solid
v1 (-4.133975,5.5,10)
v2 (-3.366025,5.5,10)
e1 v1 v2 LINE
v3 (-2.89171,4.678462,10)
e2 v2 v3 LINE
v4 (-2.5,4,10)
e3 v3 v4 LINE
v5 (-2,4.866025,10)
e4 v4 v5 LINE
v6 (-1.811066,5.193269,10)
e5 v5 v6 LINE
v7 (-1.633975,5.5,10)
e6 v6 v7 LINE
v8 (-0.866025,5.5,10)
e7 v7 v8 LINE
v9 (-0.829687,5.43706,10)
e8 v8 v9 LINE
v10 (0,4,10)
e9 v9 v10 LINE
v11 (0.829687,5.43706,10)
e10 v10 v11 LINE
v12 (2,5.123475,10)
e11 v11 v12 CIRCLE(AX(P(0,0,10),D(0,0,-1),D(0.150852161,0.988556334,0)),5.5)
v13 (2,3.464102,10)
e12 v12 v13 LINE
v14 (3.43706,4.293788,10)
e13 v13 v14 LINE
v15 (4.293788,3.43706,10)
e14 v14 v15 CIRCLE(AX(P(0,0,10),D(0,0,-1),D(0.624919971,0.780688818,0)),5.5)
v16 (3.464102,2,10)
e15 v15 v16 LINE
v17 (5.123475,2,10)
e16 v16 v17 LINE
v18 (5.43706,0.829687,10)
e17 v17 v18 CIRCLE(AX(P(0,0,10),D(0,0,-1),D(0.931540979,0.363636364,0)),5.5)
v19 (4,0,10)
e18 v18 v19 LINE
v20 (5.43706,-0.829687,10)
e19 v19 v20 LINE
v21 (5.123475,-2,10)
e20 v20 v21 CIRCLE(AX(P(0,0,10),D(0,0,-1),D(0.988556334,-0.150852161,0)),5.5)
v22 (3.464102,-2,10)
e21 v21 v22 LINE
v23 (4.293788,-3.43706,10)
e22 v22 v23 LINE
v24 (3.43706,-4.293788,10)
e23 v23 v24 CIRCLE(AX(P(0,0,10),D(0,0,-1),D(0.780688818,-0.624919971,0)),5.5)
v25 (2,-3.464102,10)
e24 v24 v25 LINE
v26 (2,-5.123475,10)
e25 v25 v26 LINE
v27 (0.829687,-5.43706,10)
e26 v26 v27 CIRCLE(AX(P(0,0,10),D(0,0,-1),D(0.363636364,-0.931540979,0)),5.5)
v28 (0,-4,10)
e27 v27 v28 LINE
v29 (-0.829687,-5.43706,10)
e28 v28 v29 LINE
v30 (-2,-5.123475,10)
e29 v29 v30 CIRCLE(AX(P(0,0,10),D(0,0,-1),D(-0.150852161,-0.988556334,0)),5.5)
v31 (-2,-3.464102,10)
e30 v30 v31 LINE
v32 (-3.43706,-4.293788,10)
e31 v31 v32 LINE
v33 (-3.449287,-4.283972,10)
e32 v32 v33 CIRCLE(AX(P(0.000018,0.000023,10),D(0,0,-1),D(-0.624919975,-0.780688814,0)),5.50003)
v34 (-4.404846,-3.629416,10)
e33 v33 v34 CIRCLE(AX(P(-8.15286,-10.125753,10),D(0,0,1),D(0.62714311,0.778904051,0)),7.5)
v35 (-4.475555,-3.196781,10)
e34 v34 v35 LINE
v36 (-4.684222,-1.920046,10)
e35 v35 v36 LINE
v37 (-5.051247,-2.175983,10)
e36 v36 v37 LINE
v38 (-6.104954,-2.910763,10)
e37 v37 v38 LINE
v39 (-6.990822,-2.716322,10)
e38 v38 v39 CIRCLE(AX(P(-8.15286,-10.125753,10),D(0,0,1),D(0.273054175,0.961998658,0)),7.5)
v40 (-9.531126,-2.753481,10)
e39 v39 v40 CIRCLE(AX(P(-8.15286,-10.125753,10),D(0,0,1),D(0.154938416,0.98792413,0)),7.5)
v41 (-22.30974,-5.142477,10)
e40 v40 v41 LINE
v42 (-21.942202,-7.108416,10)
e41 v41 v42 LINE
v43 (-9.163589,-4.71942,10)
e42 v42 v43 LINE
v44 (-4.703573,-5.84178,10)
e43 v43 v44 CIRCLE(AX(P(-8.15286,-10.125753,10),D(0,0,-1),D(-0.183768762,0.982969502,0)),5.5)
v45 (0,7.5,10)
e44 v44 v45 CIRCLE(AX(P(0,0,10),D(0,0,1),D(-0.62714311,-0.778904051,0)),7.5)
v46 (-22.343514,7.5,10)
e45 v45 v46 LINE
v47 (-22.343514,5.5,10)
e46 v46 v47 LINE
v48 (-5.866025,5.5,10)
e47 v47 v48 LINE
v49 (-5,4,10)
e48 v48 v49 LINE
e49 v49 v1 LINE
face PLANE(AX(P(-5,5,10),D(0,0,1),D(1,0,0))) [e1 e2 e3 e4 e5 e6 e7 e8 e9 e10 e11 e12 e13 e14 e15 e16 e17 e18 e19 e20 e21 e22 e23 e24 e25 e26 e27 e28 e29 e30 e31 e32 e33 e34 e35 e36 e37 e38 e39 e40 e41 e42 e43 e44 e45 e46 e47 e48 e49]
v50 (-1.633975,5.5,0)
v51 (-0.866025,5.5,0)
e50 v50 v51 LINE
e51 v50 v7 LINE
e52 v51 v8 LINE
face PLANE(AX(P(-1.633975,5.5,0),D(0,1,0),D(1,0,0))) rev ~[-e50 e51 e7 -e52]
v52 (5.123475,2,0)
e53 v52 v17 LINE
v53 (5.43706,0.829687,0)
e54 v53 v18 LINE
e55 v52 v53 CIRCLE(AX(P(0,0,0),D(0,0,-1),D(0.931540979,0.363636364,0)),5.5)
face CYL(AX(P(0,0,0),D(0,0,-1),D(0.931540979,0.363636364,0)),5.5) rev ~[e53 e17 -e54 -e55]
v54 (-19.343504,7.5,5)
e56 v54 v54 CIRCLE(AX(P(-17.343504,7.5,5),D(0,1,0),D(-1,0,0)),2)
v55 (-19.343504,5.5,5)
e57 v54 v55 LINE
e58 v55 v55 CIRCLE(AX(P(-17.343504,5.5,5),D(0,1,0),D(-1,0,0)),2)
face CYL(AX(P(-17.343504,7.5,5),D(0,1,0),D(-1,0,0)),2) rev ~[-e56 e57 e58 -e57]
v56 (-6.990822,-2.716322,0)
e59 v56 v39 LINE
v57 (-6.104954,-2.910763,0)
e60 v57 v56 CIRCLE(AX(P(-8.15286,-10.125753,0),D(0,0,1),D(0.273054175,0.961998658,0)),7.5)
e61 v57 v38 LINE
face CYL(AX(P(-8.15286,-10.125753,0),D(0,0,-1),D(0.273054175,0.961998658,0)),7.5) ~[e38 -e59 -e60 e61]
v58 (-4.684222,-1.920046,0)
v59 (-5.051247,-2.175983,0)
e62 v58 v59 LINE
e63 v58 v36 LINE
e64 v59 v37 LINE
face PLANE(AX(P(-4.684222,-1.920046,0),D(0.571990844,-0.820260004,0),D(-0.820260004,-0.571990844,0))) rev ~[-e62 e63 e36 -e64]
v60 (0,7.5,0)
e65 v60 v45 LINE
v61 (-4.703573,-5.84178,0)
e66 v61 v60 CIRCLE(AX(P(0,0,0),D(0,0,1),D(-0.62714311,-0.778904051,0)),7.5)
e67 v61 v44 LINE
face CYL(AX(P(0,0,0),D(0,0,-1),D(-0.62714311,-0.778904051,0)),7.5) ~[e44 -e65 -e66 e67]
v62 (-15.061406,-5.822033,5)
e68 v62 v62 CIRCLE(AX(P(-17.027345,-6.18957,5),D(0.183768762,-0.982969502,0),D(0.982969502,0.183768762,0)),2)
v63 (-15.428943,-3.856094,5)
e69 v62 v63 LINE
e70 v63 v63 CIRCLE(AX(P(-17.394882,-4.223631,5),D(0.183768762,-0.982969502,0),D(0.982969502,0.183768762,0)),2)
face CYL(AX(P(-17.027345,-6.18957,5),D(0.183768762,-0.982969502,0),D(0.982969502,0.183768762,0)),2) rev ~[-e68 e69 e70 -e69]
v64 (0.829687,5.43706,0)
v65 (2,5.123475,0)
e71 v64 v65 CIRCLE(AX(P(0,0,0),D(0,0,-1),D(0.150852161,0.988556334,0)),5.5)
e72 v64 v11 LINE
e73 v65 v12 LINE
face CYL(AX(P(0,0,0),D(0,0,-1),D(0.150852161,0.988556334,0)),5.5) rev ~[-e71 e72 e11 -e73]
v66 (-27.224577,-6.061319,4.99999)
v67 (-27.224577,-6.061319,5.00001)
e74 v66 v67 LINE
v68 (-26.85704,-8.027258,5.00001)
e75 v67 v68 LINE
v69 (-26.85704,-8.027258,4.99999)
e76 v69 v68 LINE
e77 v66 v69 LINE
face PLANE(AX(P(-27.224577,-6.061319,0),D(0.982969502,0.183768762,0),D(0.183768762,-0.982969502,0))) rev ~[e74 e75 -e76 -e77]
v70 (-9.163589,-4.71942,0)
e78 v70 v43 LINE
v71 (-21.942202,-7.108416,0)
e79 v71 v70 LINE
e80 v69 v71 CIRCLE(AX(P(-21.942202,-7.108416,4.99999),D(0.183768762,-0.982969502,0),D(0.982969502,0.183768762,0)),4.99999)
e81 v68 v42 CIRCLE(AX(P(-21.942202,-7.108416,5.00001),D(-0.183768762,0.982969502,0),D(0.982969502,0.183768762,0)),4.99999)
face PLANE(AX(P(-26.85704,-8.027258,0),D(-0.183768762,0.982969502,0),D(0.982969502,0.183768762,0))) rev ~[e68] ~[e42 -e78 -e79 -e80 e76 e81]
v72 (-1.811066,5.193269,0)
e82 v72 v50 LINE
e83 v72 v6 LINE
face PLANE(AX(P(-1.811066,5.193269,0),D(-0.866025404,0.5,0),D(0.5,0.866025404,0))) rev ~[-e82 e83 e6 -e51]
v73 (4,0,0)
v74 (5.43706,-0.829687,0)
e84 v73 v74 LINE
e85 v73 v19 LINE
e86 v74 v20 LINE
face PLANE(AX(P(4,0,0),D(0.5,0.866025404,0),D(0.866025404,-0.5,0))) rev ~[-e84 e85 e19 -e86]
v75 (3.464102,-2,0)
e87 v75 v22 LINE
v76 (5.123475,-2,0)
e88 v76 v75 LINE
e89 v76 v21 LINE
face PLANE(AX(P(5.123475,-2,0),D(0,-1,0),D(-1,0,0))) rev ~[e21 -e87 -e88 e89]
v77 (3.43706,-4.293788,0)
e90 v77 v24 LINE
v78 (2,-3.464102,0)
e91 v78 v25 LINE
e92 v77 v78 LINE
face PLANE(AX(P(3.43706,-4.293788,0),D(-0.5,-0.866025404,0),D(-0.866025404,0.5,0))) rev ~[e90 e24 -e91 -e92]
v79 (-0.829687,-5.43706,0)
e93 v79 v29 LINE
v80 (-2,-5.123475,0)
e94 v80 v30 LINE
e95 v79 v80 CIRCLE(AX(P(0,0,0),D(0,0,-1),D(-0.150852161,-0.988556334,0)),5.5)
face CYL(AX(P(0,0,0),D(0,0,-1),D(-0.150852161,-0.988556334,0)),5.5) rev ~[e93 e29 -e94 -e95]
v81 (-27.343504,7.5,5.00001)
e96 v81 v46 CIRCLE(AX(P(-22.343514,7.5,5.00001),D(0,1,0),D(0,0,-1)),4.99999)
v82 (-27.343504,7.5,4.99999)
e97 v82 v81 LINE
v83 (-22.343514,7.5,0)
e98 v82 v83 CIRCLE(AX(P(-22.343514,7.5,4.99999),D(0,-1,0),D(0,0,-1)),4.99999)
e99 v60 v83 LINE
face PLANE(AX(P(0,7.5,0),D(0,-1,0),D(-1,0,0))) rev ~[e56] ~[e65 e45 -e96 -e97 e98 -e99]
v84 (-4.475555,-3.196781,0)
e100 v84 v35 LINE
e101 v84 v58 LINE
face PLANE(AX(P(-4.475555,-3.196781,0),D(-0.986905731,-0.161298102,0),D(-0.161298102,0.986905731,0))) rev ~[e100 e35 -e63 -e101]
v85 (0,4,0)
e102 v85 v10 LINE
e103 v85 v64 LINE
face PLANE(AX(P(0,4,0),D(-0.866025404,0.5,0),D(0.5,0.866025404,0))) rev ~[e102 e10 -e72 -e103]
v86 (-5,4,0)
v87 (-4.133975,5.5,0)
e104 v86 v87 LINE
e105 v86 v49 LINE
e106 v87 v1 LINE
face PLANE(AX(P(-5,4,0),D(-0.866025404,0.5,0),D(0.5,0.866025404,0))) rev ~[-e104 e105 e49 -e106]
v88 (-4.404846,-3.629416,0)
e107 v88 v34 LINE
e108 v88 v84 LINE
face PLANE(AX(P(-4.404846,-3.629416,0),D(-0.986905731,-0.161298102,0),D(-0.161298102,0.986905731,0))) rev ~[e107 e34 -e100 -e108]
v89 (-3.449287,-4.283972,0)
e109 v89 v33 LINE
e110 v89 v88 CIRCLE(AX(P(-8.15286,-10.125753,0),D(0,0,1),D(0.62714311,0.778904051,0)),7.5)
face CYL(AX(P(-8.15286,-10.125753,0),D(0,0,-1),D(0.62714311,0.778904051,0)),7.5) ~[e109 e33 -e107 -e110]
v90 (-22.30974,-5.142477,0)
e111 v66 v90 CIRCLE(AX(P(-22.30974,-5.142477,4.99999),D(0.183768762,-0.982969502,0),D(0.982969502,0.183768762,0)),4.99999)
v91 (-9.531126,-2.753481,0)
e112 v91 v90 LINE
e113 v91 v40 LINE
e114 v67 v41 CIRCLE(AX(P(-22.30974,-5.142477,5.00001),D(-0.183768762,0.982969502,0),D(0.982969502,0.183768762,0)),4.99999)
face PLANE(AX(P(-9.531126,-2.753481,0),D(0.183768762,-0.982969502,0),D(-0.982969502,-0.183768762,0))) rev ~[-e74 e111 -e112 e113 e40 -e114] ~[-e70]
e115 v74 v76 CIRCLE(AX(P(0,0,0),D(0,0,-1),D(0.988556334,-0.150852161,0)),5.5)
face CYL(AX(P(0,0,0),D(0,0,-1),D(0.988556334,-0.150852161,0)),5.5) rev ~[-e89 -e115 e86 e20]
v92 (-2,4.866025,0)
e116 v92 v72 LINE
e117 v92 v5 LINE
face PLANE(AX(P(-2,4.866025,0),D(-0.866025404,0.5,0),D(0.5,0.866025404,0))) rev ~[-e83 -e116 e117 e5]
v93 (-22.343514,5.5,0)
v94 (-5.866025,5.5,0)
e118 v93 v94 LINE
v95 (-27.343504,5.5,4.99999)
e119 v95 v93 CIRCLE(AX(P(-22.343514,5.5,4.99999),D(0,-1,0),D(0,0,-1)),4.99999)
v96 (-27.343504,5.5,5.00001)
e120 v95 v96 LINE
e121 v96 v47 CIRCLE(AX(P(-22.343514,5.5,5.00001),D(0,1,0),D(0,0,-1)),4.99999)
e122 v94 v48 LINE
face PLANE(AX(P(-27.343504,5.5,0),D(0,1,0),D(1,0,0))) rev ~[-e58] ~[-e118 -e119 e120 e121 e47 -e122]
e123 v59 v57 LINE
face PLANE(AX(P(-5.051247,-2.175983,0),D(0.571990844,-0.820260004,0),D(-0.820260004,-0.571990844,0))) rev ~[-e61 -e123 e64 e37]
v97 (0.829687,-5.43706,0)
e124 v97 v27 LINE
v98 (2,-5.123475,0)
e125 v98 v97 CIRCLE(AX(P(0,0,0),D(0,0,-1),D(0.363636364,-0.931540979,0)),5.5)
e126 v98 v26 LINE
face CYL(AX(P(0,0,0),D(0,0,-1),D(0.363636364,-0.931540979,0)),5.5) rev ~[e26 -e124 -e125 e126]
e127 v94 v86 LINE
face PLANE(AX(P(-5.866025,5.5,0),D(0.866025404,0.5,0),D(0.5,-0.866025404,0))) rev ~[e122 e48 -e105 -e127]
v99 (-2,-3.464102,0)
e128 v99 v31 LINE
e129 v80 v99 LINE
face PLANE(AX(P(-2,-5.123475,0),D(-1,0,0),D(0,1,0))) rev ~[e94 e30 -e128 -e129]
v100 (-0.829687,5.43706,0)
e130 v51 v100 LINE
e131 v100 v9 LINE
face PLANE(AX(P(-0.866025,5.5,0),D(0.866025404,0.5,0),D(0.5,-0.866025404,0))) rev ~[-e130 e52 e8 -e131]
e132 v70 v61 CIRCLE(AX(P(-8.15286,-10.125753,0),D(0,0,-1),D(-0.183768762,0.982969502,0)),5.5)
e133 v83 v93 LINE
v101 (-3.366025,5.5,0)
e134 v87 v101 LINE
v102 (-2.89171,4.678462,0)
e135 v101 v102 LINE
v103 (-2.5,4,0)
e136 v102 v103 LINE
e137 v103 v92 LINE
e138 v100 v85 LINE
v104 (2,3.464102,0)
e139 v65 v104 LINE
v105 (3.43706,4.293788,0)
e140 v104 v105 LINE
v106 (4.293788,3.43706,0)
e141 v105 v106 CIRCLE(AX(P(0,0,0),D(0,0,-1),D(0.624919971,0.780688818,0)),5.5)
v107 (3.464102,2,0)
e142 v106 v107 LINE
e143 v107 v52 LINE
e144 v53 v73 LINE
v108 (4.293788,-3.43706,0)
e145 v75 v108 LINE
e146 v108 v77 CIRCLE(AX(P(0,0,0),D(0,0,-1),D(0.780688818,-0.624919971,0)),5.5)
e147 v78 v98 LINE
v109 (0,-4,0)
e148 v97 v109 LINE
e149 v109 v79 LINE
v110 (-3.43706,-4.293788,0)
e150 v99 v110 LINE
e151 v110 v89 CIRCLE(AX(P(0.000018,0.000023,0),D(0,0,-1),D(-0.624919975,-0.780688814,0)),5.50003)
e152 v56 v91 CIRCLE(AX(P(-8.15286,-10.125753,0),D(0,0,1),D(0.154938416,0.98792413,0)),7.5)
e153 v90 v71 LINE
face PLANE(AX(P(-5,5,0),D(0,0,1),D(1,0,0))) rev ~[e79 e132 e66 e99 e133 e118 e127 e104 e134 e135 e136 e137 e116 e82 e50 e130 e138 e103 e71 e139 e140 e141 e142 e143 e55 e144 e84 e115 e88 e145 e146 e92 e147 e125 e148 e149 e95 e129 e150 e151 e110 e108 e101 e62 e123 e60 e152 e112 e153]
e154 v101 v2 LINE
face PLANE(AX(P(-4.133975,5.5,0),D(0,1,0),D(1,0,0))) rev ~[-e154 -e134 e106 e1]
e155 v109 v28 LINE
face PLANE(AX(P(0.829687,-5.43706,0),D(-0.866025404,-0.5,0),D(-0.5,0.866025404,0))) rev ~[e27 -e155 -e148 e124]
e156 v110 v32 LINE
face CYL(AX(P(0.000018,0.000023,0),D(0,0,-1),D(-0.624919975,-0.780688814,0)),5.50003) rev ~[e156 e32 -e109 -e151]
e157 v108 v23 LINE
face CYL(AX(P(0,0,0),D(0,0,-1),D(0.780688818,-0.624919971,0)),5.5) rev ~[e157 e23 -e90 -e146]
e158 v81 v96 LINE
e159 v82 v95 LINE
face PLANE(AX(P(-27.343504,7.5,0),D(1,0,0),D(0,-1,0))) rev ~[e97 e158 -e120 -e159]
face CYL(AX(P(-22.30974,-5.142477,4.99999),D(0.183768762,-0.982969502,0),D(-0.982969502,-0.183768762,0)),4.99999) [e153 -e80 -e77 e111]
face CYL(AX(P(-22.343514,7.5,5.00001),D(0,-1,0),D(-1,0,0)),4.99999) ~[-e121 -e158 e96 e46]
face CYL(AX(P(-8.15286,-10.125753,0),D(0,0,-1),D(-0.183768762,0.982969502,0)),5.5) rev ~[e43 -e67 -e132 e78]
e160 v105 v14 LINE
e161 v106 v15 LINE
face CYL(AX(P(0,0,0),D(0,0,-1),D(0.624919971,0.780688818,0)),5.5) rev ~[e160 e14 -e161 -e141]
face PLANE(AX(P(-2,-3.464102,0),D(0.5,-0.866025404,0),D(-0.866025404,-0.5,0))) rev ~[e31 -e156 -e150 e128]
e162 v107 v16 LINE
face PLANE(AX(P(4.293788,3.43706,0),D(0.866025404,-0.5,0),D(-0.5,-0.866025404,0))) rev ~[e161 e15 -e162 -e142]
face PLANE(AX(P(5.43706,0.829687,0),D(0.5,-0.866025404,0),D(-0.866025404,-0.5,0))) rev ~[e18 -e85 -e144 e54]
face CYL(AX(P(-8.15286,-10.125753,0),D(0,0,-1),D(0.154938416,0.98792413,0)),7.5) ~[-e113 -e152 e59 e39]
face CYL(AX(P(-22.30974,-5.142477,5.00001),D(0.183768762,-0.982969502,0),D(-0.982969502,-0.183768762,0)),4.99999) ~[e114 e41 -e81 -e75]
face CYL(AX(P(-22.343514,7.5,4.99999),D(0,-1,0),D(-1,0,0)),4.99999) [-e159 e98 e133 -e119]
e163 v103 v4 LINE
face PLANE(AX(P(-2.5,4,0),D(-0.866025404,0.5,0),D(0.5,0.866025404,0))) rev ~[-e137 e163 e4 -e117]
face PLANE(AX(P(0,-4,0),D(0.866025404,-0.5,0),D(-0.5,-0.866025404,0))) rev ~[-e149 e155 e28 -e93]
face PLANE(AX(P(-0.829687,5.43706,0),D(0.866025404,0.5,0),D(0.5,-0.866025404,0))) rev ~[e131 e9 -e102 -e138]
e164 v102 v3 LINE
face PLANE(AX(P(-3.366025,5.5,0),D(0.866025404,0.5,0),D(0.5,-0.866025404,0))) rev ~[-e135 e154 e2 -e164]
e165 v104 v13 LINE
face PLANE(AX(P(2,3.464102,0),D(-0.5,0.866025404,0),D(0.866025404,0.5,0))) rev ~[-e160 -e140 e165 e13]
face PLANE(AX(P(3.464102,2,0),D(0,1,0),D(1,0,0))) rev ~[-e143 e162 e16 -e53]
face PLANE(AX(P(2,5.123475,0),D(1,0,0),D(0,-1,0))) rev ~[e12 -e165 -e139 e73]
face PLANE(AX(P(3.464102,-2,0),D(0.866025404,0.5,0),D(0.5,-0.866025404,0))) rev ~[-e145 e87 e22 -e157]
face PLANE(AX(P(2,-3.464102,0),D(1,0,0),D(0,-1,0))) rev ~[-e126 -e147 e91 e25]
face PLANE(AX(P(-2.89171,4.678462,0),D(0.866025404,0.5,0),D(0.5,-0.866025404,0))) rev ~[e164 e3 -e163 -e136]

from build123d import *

# Parameters (mm, degrees)
F1_DEPTH = 10
F2_R     = 4.99999
F3_R     = 2
F4_DEPTH = 2
F5_R     = 2
F6_DEPTH = 2


# Not quite as in the source:
# - a fillet or chamfer is up to 0.001 mm smaller than in the source, because OpenCascade refuses the exact size


with BuildPart() as f1:
    # F0 (on Top) → F1 (new body)
    with BuildSketch(Plane.XY):
        Polygon((-5, 4), (-4.1339745962, 5.5), (-5.8660254038, 5.5), align=None)
        Polygon((-26.857039656, -8.0272581187), (-9.163588619, -4.7194203959), (-9.5311261437, -2.7534813918), (-27.2245771808, -6.0613191145), align=None)
        with BuildLine():
            ThreePointArc((-3.4370598373, -4.2937884991), (-2.75, -4.7631397208), (-2, -5.123475383))
            Line((-2, -5.123475383), (-2, -3.4641016151))
            Line((-2, -3.4641016151), (-3.4370598373, -4.2937884991))
        make_face()
        with BuildLine():
            ThreePointArc((-0.8296868839, -5.4370598373), (0, -5.5), (0.8296868839, -5.4370598373))
            Line((0.8296868839, -5.4370598373), (0, -4))
            Line((0, -4), (-0.8296868839, -5.4370598373))
        make_face()
        with BuildLine():
            ThreePointArc((2, -5.123475383), (2.75, -4.7631397208), (3.4370598373, -4.2937884991))
            Line((3.4370598373, -4.2937884991), (2, -3.4641016151))
            Line((2, -3.4641016151), (2, -5.123475383))
        make_face()
        with BuildLine():
            ThreePointArc((4.2937884991, -3.4370598373), (4.7631397208, -2.75), (5.123475383, -2))
            Line((5.123475383, -2), (3.4641016151, -2))
            Line((3.4641016151, -2), (4.2937884991, -3.4370598373))
        make_face()
        with BuildLine():
            ThreePointArc((5.4370598373, -0.8296868839), (5.5, 0), (5.4370598373, 0.8296868839))
            Line((5.4370598373, 0.8296868839), (4, 0))
            Line((4, 0), (5.4370598373, -0.8296868839))
        make_face()
        with BuildLine():
            Line((0, 4), (0.8296868839, 5.4370598373))
            ThreePointArc((0.8296868839, 5.4370598373), (0.416035392, 5.4842423864), (0, 5.5))
            Line((0, 5.5), (0, 4))
        make_face()
        with BuildLine():
            ThreePointArc((0, 5.5), (0.416035392, 5.4842423864), (0.8296868839, 5.4370598373))
            Line((0.8296868839, 5.4370598373), (0.8660254038, 5.5))
            Line((0.8660254038, 5.5), (0, 5.5))
        make_face()
        with BuildLine():
            Line((0, 4), (0, 5.5))
            ThreePointArc((0, 5.5), (-0.416035392, 5.4842423864), (-0.8296868839, 5.4370598373))
            Line((-0.8296868839, 5.4370598373), (0, 4))
        make_face()
        with BuildLine():
            Line((-2, 4.8660254038), (-1.8110659829, 5.1932687207))
            ThreePointArc((-1.8110659829, 5.1932687207), (-1.9058525019, 5.1592369824), (-2, 5.123475383))
            Line((-2, 5.123475383), (-2, 4.8660254038))
        make_face()
        with BuildLine():
            Line((-2, 4.8660254038), (-2, 5.123475383))
            ThreePointArc((-2, 5.123475383), (-2.4559554031, 4.9212074797), (-2.8917104606, 4.6784624196))
            Line((-2.8917104606, 4.6784624196), (-2.5, 4))
            Line((-2.5, 4), (-2, 4.8660254038))
        make_face()
        with BuildLine():
            ThreePointArc((-9.163588619, -4.7194203959), (-6.8106363862, -4.7920452574), (-4.7035733226, -5.8417803792))
            ThreePointArc((-4.7035733226, -5.8417803792), (-6.0524247462, -4.4292386131), (-6.9908223073, -2.7163216797))
            ThreePointArc((-6.9908223073, -2.7163216797), (-8.2625591256, -2.6265549538), (-9.5311261437, -2.7534813918))
            Line((-9.5311261437, -2.7534813918), (-9.163588619, -4.7194203959))
        make_face()
        with BuildLine():
            Line((-4.6842221141, -1.9200455203), (-4.9155419039, -2.4672753781))
            ThreePointArc((-4.9155419039, -2.4672753781), (-4.7096941165, -2.8405600379), (-4.4755547297, -3.196781172))
            Line((-4.4755547297, -3.196781172), (-4.6842221141, -1.9200455203))
        make_face()
        with BuildLine():
            Line((-4.6842221141, -1.9200455203), (-5.0512472947, -2.175982713))
            ThreePointArc((-5.0512472947, -2.175982713), (-4.9855224988, -2.3226203765), (-4.9155419039, -2.4672753781))
            Line((-4.9155419039, -2.4672753781), (-4.6842221141, -1.9200455203))
        make_face()
        with BuildLine():
            ThreePointArc((-0.8296868839, 5.4370598373), (-0.416035392, 5.4842423864), (0, 5.5))
            Line((0, 5.5), (-0.8660254038, 5.5))
            Line((-0.8660254038, 5.5), (-0.8296868839, 5.4370598373))
        make_face()
        with BuildLine():
            Line((-5.0512472947, -2.175982713), (-6.104954117, -2.9107627231))
            ThreePointArc((-6.104954117, -2.9107627231), (-5.6640980624, -3.0507217811), (-5.2327078262, -3.2175901813))
            Line((-5.2327078262, -3.2175901813), (-4.9155419039, -2.4672753781))
            ThreePointArc((-4.9155419039, -2.4672753781), (-4.9855224988, -2.3226203765), (-5.0512472947, -2.175982713))
        make_face()
        with BuildLine():
            ThreePointArc((-2, 5.123475383), (-1.9058525019, 5.1592369824), (-1.8110659829, 5.1932687207))
            Line((-1.8110659829, 5.1932687207), (-1.6339745962, 5.5))
            Line((-1.6339745962, 5.5), (-3.3660254038, 5.5))
            Line((-3.3660254038, 5.5), (-2.8917104606, 4.6784624196))
            ThreePointArc((-2.8917104606, 4.6784624196), (-2.4559554031, 4.9212074797), (-2, 5.123475383))
        make_face()
        with BuildLine():
            Line((-4.9155419039, -2.4672753781), (-5.2327078262, -3.2175901813))
            ThreePointArc((-5.2327078262, -3.2175901813), (-4.8124241684, -3.4107332523), (-4.404845606, -3.629416389))
            Line((-4.404845606, -3.629416389), (-4.4755547297, -3.196781172))
            ThreePointArc((-4.4755547297, -3.196781172), (-4.7096941165, -2.8405600379), (-4.9155419039, -2.4672753781))
        make_face()
        with BuildLine():
            ThreePointArc((0.8296868839, 5.4370598373), (1.4235047481, 5.3125920446), (2, 5.123475383))
            Line((2, 5.123475383), (2, 3.4641016151))
            Line((2, 3.4641016151), (3.4370598373, 4.2937884991))
            ThreePointArc((3.4370598373, 4.2937884991), (3.8890872965, 3.8890872965), (4.2937884991, 3.4370598373))
            Line((4.2937884991, 3.4370598373), (3.4641016151, 2))
            Line((3.4641016151, 2), (5.123475383, 2))
            ThreePointArc((5.123475383, 2), (5.3125920446, 1.4235047481), (5.4370598373, 0.8296868839))
            ThreePointArc((5.4370598373, 0.8296868839), (5.5, 0), (5.4370598373, -0.8296868839))
            ThreePointArc((5.4370598373, -0.8296868839), (5.3125920446, -1.4235047481), (5.123475383, -2))
            ThreePointArc((5.123475383, -2), (4.7631397208, -2.75), (4.2937884991, -3.4370598373))
            ThreePointArc((4.2937884991, -3.4370598373), (3.8890872965, -3.8890872965), (3.4370598373, -4.2937884991))
            ThreePointArc((3.4370598373, -4.2937884991), (2.75, -4.7631397208), (2, -5.123475383))
            ThreePointArc((2, -5.123475383), (1.4235047481, -5.3125920446), (0.8296868839, -5.4370598373))
            ThreePointArc((0.8296868839, -5.4370598373), (0, -5.5), (-0.8296868839, -5.4370598373))
            ThreePointArc((-0.8296868839, -5.4370598373), (-1.4235047481, -5.3125920446), (-2, -5.123475383))
            ThreePointArc((-2, -5.123475383), (-2.75, -4.7631397208), (-3.4370598373, -4.2937884991))
            ThreePointArc((-3.4370598373, -4.2937884991), (-3.4431769685, -4.2888847459), (-3.4492871033, -4.2839722781))
            ThreePointArc((-3.4492871033, -4.2839722781), (-3.9144118435, -3.9382205471), (-4.404845606, -3.629416389))
            ThreePointArc((-4.404845606, -3.629416389), (-4.8124241684, -3.4107332523), (-5.2327078262, -3.2175901813))
            ThreePointArc((-5.2327078262, -3.2175901813), (-5.6640980624, -3.0507217811), (-6.104954117, -2.9107627231))
            ThreePointArc((-6.104954117, -2.9107627231), (-6.544946362, -2.800139211), (-6.9908223073, -2.7163216797))
            ThreePointArc((-6.9908223073, -2.7163216797), (-6.0524247462, -4.4292386131), (-4.7035733226, -5.8417803792))
            ThreePointArc((-4.7035733226, -5.8417803792), (7.0733073185, -2.493656668), (0, 7.5))
            Line((0, 7.5), (-27.3435036541, 7.5))
            Line((-27.3435036541, 7.5), (-27.3435036541, 5.5))
            Line((-27.3435036541, 5.5), (-5.8660254038, 5.5))
            Line((-5.8660254038, 5.5), (-4.1339745962, 5.5))
            Line((-4.1339745962, 5.5), (-3.3660254038, 5.5))
            Line((-3.3660254038, 5.5), (-1.6339745962, 5.5))
            Line((-1.6339745962, 5.5), (-0.8660254038, 5.5))
            Line((-0.8660254038, 5.5), (0, 5.5))
            Line((0, 5.5), (0.8660254038, 5.5))
            Line((0.8660254038, 5.5), (0.8296868839, 5.4370598373))
        make_face()
    extrude(amount=F1_DEPTH)

    # F2 (radius 5 in the source; OpenCascade refuses exactly that, so slightly less here)
    f2_edges = [f1.edges().sort_by_distance(p)[0] for p in [
        (-27.343504, 6.5, 10),
        (-27.343504, 6.5, 0),
        (-27.040808, -7.044289, 0),
        (-27.040808, -7.044289, 10),
    ]]
    fillet(f2_edges, radius=F2_R)

    # F3 (on face) → F4 (cut)
    with BuildSketch(Plane(origin=(0.5430486336, -2.9047387492, 0), x_dir=(0.9829695021, 0.1837687624, 0), z_dir=(0.1837687624, -0.9829695021, 0))):
        with Locations((-17.8748101871, 5)):
            Circle(F3_R)
    extrude(amount=-F4_DEPTH, mode=Mode.SUBTRACT)

    # F5 (on face) → F6 (cut)
    with BuildSketch(Plane(origin=(0, 7.5, 0), x_dir=(-1, 0, 0), z_dir=(0, 1, 0))):
        with Locations((17.3435036541, 5)):
            Circle(F5_R)
    extrude(amount=-F6_DEPTH, mode=Mode.SUBTRACT)


solid = f1.part
